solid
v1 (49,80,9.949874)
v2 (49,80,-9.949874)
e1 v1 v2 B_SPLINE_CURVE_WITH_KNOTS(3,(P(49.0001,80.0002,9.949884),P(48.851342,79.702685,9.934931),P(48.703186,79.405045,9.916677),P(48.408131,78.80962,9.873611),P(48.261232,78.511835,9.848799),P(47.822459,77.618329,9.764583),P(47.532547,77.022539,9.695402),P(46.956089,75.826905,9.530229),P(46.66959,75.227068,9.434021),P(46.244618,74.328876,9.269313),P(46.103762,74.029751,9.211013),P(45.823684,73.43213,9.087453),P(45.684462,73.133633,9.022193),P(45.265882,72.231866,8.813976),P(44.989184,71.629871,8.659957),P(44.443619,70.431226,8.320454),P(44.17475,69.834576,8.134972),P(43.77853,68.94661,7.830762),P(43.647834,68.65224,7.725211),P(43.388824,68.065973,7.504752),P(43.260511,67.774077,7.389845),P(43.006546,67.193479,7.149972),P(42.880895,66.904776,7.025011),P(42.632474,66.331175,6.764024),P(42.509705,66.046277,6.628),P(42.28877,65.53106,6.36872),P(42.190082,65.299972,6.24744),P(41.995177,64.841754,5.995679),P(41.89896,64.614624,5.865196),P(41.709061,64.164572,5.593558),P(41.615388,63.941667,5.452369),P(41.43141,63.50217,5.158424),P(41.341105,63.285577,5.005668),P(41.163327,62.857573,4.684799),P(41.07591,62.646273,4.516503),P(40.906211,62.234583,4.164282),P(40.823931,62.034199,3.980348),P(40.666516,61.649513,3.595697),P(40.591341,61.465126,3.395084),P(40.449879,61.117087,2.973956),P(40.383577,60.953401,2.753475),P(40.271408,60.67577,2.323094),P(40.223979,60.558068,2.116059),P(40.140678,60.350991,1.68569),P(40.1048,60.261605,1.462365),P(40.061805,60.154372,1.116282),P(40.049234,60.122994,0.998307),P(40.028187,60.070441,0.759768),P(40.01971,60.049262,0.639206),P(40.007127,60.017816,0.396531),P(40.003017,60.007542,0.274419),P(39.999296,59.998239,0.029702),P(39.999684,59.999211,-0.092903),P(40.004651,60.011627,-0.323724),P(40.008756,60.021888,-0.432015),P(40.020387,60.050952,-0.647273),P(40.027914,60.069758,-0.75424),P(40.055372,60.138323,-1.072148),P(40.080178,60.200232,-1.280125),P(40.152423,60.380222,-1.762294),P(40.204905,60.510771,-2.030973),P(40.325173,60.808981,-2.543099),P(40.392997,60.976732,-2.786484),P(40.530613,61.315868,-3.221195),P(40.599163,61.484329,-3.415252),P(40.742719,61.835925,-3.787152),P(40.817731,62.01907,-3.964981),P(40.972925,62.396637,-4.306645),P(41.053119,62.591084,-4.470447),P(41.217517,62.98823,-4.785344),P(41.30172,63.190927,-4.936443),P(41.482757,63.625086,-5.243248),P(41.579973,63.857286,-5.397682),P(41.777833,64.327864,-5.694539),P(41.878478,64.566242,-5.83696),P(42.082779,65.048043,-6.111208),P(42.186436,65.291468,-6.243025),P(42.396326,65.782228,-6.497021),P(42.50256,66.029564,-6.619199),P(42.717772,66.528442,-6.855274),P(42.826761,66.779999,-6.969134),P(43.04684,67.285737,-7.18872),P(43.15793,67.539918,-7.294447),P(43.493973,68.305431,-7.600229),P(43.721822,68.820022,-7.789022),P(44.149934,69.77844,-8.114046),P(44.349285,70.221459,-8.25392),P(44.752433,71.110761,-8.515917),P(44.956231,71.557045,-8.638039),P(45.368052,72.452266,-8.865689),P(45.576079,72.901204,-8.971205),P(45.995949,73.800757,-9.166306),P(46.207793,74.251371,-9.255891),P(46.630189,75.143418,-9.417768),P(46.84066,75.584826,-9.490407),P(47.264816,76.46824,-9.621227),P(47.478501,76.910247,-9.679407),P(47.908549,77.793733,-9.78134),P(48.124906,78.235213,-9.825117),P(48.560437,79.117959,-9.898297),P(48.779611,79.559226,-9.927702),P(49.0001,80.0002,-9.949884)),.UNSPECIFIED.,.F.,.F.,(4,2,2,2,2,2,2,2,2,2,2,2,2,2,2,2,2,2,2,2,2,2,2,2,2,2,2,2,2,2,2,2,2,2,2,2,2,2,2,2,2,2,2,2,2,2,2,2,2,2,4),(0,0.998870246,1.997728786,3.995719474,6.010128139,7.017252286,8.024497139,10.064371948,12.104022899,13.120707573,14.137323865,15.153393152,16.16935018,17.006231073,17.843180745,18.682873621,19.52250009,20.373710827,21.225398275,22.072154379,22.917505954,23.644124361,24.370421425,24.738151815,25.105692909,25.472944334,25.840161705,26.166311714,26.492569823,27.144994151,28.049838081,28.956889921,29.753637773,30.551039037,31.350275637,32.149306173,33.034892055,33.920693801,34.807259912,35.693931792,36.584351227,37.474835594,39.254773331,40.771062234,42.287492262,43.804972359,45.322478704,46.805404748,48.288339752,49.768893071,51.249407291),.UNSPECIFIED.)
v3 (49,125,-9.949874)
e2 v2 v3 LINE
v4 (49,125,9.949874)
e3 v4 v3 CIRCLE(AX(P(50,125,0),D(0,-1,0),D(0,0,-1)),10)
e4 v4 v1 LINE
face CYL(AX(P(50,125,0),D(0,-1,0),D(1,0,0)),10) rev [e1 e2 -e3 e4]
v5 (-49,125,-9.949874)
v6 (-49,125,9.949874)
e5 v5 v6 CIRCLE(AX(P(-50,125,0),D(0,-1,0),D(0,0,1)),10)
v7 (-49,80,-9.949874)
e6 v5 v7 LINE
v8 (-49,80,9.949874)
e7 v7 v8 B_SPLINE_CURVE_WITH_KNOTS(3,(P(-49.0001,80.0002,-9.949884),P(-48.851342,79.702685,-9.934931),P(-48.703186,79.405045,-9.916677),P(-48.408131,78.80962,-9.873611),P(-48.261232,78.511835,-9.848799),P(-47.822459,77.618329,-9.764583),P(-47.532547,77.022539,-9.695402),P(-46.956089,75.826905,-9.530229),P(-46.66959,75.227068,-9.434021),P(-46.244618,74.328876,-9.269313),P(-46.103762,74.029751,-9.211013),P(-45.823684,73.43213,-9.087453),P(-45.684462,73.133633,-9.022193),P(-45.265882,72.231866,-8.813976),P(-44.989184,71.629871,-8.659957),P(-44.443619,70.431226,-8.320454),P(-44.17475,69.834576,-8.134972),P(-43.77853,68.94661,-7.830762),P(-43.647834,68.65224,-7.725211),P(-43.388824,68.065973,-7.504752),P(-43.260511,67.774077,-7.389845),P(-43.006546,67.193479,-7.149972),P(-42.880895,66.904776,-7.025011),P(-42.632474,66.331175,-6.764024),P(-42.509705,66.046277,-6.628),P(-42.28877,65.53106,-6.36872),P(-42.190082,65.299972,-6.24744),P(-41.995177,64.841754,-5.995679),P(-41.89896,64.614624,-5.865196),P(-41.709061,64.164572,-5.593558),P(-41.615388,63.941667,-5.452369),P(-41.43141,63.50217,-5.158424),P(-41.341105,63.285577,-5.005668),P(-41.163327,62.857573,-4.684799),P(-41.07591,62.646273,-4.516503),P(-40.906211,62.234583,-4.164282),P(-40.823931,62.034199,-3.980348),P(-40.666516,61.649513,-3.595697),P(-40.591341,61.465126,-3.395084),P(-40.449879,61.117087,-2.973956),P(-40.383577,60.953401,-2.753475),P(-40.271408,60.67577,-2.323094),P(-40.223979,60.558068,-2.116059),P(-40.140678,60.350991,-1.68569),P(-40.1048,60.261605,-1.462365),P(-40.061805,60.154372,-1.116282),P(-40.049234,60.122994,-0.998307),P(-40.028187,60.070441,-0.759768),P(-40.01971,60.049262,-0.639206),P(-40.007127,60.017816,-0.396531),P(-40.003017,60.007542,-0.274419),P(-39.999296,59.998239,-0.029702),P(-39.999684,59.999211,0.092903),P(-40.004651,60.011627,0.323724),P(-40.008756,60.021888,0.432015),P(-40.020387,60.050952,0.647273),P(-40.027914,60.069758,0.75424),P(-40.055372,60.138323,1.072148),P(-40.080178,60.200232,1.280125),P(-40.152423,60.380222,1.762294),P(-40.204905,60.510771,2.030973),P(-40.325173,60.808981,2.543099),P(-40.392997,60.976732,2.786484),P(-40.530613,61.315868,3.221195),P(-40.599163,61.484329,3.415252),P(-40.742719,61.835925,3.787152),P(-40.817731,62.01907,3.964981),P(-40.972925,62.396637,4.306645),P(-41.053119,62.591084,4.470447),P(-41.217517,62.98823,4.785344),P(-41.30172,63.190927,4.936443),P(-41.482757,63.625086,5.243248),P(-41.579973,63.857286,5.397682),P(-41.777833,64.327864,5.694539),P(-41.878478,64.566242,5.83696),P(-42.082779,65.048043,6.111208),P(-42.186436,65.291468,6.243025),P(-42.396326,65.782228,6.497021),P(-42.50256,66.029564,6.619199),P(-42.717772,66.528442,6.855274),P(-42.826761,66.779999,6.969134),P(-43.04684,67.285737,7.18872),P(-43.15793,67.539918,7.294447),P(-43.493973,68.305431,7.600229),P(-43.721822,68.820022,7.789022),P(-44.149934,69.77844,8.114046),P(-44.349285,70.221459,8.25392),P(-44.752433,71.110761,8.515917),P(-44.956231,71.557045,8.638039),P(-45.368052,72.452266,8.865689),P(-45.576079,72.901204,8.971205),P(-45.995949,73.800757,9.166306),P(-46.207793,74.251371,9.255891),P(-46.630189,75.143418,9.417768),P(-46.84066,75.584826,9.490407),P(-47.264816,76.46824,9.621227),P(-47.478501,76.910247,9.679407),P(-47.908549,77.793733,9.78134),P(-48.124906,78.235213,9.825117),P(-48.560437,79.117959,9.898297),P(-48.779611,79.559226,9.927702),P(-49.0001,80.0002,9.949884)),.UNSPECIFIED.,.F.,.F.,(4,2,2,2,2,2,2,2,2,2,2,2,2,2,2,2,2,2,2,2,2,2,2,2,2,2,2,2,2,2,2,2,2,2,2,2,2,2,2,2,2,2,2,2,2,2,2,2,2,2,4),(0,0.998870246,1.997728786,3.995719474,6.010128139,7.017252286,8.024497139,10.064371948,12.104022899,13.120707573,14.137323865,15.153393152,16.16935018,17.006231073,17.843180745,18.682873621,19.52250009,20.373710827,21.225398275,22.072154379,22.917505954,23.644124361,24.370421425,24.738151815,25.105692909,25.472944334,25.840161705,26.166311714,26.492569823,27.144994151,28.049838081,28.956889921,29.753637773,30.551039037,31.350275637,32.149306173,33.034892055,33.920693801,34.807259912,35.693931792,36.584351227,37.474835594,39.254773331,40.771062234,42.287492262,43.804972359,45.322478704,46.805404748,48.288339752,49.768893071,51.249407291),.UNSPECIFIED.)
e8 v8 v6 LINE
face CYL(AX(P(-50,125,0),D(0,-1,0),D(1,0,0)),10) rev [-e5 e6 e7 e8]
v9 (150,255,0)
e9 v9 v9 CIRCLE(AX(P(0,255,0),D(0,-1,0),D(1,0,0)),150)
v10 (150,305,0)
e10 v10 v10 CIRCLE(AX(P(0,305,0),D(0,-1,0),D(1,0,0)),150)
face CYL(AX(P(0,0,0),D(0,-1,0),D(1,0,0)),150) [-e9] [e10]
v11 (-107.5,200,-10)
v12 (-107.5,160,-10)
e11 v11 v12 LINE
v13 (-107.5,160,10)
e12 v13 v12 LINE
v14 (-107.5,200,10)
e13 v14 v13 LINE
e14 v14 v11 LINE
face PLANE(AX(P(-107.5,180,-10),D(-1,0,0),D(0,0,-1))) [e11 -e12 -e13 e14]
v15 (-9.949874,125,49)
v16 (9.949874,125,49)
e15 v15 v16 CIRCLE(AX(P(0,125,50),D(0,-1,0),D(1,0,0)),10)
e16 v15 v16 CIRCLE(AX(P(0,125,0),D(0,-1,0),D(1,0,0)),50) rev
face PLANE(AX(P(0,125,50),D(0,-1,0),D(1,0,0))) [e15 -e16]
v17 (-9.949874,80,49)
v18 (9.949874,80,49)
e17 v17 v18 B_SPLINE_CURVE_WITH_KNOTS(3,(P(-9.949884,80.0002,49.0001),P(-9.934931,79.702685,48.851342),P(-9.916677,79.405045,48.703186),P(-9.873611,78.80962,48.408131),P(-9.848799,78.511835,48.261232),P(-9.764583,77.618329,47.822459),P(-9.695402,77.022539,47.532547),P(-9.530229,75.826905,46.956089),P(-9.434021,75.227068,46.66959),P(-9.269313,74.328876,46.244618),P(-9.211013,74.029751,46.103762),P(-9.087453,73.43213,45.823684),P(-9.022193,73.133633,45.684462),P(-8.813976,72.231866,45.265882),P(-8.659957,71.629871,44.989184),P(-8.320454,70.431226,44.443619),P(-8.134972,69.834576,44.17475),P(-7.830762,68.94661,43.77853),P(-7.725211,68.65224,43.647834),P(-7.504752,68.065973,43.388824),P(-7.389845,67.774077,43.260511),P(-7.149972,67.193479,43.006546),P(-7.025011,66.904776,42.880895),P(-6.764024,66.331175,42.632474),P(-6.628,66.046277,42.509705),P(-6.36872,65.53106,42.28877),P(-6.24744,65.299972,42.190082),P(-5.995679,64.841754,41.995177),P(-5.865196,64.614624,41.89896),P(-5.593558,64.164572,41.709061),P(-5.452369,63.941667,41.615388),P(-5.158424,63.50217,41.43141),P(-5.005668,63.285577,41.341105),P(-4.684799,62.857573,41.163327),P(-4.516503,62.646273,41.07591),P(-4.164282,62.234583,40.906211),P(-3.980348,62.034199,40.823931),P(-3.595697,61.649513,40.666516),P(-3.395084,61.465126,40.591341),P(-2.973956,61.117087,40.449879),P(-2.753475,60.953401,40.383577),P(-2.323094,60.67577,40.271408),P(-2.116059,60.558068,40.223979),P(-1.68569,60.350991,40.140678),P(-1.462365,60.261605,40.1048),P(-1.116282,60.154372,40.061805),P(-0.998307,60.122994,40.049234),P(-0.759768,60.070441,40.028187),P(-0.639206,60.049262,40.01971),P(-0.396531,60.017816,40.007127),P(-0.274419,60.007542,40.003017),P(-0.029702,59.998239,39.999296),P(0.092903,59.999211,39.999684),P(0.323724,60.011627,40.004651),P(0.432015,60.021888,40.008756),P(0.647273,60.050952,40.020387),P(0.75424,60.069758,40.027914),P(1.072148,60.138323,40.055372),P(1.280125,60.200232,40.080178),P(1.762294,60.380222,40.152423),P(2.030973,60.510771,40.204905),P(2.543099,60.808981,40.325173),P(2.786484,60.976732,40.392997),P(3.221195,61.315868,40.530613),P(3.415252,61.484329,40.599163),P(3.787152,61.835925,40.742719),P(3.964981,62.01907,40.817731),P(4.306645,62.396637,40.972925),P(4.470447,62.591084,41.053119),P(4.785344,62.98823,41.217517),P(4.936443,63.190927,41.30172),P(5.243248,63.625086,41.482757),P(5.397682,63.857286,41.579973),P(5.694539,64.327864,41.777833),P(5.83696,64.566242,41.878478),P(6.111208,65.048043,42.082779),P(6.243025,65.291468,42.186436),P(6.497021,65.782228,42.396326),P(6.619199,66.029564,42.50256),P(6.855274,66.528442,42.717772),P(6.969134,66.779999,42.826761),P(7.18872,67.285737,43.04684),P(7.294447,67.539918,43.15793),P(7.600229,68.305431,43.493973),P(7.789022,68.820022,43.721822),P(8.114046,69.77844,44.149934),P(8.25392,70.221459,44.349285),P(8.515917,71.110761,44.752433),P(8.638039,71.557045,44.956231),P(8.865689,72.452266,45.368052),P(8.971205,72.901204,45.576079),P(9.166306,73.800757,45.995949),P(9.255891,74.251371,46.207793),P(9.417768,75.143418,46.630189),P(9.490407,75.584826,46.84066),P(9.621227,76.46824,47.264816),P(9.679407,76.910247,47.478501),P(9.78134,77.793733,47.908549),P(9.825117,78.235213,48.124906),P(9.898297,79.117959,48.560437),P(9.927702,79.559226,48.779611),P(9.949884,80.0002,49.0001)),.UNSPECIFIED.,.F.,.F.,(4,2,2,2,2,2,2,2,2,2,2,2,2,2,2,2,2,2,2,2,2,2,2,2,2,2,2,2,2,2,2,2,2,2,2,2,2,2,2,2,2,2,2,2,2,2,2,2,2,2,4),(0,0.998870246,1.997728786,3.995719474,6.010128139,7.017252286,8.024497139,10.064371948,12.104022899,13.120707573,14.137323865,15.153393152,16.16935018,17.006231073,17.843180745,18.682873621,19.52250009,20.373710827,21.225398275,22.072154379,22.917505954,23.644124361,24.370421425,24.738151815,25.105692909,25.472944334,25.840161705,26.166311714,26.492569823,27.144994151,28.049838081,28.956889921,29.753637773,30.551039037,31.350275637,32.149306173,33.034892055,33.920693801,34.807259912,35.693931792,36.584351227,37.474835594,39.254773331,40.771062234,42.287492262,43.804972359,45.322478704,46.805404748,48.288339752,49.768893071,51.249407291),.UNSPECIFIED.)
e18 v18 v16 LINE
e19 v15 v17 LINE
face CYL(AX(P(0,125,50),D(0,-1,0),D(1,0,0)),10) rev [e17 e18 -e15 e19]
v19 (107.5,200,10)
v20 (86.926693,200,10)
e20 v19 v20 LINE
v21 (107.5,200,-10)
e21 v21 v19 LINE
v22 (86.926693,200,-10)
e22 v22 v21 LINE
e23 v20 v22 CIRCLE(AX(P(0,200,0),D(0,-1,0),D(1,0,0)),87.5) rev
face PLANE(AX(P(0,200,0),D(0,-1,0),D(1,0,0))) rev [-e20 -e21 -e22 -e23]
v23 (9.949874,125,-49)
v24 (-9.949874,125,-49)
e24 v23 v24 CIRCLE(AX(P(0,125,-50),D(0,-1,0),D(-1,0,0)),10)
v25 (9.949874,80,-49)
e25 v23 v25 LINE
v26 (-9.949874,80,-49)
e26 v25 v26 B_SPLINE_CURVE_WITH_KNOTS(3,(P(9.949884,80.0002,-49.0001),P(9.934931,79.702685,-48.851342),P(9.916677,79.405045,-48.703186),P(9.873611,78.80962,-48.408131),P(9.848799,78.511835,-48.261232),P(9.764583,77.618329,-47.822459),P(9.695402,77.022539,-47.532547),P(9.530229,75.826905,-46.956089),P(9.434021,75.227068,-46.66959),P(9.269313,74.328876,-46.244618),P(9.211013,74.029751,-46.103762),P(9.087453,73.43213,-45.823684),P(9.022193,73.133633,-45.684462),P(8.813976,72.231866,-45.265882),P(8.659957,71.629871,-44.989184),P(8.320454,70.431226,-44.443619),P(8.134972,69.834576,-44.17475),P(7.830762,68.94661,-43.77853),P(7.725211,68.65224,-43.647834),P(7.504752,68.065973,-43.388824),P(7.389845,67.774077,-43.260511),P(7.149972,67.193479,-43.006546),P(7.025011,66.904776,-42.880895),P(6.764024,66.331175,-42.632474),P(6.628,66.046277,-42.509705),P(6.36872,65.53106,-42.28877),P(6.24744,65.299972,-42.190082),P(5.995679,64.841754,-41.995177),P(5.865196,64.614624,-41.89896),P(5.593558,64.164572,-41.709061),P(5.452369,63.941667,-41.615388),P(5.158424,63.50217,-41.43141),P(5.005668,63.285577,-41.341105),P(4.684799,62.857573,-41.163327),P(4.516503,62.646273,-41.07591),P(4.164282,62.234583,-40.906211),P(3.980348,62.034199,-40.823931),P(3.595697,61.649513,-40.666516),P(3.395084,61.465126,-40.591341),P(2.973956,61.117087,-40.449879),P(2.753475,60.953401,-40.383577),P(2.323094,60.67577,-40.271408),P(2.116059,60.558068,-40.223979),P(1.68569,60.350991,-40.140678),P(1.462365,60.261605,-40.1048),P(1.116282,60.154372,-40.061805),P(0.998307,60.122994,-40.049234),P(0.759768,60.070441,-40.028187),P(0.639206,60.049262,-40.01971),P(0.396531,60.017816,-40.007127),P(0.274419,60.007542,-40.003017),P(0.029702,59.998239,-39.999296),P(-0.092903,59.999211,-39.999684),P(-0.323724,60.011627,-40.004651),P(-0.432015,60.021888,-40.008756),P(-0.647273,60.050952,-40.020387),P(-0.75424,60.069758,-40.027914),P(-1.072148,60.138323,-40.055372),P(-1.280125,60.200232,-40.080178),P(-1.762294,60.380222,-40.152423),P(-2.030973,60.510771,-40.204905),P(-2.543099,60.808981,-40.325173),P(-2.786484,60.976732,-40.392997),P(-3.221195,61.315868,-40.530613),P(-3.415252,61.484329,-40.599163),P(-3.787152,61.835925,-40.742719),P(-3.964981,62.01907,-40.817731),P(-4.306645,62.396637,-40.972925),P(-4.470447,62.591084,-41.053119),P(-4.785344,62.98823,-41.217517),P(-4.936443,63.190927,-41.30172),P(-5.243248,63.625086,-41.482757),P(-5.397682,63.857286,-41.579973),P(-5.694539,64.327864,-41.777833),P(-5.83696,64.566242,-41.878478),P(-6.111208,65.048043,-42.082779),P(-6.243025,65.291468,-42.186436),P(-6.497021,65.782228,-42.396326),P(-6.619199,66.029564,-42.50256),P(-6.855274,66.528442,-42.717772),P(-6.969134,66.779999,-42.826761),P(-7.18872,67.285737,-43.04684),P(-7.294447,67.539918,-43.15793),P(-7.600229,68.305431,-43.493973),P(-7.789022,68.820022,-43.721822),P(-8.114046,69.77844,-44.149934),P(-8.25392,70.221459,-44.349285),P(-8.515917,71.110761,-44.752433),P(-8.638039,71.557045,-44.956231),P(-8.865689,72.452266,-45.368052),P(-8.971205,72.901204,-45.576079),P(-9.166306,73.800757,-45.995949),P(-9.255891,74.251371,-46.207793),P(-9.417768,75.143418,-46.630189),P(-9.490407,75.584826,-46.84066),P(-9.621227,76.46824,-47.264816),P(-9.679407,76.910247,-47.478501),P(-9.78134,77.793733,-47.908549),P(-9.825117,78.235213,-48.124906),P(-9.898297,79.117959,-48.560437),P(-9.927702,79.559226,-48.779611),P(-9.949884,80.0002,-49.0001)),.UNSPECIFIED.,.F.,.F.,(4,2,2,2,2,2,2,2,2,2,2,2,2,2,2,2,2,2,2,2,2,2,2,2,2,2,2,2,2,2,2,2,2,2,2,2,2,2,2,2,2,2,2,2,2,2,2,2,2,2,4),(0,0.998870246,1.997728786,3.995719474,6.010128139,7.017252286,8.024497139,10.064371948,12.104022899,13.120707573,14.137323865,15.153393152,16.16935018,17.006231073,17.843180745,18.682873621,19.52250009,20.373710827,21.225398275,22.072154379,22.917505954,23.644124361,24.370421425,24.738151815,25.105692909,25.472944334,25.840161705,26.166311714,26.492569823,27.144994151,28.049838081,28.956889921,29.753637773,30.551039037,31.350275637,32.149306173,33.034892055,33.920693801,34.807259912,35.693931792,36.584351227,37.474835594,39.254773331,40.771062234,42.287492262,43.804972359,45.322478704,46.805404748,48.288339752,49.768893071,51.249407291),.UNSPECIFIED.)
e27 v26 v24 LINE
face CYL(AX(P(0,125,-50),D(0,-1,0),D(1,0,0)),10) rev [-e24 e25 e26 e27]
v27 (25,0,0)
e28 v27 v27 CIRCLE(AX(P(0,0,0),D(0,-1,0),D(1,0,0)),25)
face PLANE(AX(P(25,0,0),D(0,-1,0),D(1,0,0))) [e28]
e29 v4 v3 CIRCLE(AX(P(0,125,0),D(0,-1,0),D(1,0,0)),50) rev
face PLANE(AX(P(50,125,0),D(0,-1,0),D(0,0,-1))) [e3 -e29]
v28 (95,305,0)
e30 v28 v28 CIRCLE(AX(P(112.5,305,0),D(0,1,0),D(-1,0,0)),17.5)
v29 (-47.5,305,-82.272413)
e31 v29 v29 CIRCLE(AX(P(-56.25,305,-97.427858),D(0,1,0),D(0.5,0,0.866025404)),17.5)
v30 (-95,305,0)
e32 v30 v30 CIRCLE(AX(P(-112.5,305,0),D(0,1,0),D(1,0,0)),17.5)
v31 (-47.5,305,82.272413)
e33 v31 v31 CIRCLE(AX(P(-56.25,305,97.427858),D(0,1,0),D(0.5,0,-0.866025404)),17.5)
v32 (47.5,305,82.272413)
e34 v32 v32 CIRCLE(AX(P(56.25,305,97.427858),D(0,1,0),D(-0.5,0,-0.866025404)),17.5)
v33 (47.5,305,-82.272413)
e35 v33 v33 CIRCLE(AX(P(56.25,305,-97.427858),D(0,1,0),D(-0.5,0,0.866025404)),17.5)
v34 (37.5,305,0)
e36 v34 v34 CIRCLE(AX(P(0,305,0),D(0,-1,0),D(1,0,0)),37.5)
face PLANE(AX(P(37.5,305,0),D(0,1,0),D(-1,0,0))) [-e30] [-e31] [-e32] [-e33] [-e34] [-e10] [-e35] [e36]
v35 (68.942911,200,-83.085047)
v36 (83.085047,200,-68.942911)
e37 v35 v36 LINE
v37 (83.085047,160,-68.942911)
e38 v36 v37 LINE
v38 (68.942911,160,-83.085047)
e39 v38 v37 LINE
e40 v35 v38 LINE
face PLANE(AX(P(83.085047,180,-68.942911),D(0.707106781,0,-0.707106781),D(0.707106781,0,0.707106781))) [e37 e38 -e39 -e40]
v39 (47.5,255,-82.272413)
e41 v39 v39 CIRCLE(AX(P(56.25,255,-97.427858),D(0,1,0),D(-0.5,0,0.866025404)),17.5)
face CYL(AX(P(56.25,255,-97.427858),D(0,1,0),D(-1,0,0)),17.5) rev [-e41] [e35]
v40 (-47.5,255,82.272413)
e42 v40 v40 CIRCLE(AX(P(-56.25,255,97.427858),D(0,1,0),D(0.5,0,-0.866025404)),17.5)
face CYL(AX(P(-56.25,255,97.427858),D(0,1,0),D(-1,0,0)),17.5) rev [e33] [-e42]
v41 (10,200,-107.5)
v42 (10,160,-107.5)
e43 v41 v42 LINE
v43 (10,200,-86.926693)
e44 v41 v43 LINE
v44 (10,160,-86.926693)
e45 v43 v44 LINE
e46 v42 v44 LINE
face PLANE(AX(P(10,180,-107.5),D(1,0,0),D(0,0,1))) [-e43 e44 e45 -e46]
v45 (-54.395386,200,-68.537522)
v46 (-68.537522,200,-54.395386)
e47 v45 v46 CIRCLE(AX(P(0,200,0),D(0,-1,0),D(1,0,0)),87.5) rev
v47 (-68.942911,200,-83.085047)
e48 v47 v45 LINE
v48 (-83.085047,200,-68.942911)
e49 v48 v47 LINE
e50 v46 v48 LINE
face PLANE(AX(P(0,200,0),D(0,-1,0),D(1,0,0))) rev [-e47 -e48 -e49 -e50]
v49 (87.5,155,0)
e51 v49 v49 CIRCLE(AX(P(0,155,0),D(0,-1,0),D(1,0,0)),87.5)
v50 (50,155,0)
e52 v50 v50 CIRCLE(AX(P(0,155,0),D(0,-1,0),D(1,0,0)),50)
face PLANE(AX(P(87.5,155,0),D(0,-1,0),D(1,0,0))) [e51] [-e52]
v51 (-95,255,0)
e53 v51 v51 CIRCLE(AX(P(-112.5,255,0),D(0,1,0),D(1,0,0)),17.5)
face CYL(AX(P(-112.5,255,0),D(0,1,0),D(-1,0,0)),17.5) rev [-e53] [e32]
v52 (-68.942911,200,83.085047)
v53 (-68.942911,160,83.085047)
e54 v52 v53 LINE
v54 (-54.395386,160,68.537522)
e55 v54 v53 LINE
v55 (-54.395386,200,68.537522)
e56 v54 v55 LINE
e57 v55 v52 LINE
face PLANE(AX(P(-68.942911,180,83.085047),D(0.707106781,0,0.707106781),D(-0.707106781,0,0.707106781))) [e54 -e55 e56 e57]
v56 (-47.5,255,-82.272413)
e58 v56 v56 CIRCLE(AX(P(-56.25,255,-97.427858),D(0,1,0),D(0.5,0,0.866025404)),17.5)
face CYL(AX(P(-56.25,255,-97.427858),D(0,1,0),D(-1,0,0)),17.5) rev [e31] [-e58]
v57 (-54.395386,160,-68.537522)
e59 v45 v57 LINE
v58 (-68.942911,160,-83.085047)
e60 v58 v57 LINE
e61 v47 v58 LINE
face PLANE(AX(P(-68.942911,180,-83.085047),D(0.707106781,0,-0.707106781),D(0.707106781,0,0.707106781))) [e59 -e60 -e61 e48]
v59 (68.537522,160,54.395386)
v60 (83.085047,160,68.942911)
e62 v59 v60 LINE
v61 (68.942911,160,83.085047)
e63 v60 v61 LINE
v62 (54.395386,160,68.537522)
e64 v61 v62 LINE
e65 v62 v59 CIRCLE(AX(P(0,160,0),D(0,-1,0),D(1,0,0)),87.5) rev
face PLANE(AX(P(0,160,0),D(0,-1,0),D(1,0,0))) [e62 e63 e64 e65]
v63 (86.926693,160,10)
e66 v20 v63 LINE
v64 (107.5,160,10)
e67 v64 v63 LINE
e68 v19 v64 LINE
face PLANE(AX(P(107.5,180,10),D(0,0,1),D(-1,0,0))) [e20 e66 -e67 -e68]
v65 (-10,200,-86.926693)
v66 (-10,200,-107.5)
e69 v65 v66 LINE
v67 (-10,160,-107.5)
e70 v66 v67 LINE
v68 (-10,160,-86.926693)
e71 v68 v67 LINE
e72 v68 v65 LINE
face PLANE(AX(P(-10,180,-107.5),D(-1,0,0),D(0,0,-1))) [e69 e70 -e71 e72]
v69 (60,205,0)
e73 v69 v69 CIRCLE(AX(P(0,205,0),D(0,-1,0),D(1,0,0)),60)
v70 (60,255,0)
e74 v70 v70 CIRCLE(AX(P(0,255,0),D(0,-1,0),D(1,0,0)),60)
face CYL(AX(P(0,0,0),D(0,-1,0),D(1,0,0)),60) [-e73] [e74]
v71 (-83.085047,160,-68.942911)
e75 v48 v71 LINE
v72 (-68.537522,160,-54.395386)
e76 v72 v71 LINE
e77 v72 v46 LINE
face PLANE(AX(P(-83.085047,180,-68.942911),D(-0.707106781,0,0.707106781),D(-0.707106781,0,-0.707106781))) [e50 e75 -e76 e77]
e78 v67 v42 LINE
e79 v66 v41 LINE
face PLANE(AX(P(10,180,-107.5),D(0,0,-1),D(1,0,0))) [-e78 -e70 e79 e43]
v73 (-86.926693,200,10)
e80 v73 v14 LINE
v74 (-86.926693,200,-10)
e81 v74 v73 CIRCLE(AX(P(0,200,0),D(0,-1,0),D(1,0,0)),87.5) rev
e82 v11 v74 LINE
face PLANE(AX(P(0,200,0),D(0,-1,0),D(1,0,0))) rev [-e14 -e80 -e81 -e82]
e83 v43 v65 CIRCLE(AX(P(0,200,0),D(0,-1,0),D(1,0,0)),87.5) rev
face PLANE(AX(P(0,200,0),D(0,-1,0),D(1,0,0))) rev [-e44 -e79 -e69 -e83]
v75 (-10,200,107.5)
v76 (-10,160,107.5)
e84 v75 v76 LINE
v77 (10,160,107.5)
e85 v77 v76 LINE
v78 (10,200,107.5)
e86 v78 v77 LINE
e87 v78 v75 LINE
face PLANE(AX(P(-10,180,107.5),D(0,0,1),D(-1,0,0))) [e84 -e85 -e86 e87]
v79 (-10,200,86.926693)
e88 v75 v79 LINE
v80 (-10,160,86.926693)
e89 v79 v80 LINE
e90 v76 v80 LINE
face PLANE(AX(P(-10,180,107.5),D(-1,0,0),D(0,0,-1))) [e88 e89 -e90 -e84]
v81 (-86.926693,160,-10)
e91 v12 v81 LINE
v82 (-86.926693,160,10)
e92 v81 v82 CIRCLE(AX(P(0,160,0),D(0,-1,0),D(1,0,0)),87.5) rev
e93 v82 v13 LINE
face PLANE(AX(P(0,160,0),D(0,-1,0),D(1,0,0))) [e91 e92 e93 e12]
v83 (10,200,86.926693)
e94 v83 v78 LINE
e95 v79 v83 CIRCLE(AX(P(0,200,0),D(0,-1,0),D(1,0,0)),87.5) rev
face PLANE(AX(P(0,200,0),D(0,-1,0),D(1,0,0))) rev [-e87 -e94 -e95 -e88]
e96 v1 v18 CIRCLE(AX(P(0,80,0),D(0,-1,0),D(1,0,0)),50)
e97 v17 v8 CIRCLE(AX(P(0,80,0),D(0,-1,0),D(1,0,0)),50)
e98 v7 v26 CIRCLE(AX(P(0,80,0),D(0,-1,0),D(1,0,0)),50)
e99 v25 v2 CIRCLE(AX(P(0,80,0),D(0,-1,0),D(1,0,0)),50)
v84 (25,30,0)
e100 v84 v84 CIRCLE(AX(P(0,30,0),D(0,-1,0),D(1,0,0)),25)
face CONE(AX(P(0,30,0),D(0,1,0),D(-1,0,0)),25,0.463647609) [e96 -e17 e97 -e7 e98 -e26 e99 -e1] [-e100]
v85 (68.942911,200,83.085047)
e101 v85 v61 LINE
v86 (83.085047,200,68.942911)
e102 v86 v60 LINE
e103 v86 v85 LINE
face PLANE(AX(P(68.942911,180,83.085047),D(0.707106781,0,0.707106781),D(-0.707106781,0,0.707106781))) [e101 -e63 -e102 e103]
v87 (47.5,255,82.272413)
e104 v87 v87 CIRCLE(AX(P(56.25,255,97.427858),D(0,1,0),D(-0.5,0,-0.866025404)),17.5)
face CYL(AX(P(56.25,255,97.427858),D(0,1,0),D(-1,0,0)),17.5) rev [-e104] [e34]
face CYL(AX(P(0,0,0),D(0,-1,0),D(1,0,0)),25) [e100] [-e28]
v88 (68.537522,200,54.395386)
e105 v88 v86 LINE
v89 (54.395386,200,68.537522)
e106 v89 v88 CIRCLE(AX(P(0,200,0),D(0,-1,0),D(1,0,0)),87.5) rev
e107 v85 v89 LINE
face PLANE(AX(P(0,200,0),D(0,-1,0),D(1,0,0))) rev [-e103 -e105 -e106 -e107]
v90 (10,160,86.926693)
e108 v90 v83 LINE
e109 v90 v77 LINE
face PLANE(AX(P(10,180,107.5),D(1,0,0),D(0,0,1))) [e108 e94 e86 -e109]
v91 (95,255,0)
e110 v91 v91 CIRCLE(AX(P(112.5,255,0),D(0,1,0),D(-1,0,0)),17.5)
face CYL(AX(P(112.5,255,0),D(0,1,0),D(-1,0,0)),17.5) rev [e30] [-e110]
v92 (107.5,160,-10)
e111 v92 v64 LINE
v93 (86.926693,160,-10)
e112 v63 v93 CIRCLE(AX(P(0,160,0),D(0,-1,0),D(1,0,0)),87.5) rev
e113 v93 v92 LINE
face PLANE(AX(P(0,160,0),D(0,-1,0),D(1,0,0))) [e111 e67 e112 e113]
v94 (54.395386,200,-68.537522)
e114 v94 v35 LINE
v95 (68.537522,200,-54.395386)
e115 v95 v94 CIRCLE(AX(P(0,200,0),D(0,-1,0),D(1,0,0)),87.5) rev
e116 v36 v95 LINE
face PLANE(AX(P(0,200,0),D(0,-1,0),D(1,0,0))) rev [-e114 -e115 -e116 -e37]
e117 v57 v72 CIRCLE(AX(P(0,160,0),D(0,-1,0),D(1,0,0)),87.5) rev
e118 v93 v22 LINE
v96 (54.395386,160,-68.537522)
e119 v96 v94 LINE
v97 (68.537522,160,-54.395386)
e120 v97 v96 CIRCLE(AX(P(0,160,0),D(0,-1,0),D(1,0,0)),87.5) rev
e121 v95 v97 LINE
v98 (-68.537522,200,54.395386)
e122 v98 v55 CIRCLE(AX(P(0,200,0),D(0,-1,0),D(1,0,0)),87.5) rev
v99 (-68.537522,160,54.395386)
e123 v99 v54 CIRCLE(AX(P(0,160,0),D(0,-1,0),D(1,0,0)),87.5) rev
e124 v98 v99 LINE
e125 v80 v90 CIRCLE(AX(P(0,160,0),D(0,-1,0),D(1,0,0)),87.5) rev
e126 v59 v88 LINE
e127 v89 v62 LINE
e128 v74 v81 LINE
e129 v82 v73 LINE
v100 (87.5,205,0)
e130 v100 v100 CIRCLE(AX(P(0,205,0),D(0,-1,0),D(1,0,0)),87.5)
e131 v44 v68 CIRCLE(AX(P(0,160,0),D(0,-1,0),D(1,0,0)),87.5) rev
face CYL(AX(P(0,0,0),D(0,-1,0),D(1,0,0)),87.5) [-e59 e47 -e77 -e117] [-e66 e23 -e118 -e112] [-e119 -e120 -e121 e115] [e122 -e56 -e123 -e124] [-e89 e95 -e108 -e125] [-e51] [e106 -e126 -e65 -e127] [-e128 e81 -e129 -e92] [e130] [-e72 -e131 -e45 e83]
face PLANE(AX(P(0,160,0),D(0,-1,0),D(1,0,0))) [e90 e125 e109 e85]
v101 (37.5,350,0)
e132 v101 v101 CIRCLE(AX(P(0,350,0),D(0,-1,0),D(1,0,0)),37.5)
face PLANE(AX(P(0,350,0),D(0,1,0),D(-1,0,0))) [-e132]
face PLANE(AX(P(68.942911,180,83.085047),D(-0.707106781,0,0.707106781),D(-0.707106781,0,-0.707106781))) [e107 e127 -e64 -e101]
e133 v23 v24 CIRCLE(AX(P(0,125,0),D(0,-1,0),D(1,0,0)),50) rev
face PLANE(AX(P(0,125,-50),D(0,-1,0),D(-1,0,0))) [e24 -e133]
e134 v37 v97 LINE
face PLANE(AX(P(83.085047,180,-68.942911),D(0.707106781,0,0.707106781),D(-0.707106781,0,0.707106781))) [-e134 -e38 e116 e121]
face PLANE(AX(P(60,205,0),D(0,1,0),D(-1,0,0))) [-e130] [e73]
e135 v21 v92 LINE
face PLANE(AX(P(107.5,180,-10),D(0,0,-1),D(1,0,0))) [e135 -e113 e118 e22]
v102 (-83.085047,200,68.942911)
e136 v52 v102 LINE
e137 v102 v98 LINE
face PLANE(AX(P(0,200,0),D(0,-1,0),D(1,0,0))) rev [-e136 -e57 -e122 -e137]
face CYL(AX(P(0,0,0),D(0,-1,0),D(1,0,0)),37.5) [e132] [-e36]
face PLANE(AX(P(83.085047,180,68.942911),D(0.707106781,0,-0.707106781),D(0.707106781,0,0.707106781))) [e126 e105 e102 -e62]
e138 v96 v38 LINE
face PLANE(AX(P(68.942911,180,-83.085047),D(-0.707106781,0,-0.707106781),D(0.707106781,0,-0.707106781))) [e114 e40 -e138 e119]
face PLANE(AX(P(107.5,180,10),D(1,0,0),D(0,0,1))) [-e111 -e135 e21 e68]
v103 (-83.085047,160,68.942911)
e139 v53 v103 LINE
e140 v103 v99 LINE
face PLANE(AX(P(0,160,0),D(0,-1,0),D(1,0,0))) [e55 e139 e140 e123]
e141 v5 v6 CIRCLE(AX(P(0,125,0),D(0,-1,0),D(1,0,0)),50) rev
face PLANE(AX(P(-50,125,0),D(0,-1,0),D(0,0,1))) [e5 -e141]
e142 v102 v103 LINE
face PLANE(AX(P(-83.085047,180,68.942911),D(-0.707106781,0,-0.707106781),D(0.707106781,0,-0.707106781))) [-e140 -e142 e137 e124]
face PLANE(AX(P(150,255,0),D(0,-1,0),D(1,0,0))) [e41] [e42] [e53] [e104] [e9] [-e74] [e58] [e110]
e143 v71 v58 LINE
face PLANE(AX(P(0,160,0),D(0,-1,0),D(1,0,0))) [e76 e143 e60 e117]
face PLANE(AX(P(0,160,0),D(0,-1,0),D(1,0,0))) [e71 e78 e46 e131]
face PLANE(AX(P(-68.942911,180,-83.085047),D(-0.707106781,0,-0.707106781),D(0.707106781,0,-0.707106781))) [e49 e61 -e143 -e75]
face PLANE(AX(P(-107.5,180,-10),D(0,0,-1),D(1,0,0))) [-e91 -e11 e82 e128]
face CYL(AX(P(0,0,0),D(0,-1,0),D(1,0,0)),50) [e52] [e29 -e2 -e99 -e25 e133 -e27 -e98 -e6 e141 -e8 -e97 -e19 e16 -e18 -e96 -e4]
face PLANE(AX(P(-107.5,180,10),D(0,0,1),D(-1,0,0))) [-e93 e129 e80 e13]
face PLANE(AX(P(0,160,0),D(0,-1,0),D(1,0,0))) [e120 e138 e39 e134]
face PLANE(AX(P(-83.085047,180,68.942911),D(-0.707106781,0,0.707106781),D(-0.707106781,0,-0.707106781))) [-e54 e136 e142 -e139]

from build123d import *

# Parameters (mm, degrees)
HOLE2_START        = 255
HOLE2_OUTLINE_R    = 17.5
HOLE2_DEPTH        = 50
CIRPATTERN1_COUNT  = 6
RIB2_START         = -20
RIB2_DEPTH         = 40
CIRPATTERN2_COUNT  = 8
SKETCH13_R         = 10
CUT_EXTRUDE1_DEPTH = 125
CIRPATTERN3_COUNT  = 4


# Read off the part's stored shape, not the designer's step: Hole2, Rib2
with BuildPart() as part:
    # Sketch1 → Revolve1 (revolve)
    with BuildSketch(Plane.XY):
        Polygon((0, 0), (0, 350), (37.5, 350), (37.5, 305), (150, 305), (150, 255), (60, 255), (60, 205), (87.5, 205), (87.5, 155), (50, 155), (50, 80), (25, 30), (25, 0), align=None)
    revolve(axis=Axis((0, 0, 0), (0, 1, 0)))

    # Hole2 outline → Hole2 (cut)
    with BuildSketch(Plane(origin=(0, 0, 0), x_dir=(1, 0, 0), z_dir=(0, 1, 0)).offset(HOLE2_START)):
        with Locations((112.5, 0)):
            Circle(HOLE2_OUTLINE_R)
    hole2 = extrude(amount=HOLE2_DEPTH, mode=Mode.SUBTRACT)

    # CirPattern1: Hole2 ×6 about axis
    cirpattern1_axis = Axis((0, 0, 0), (0, 1, 0))
    for i in range(1, CIRPATTERN1_COUNT):
        add(hole2.rotate(cirpattern1_axis, i * 360 / CIRPATTERN1_COUNT), mode=Mode.SUBTRACT)

    # Rib2 outline → Rib2 (add)
    with BuildSketch(Plane(origin=(0, 180, 0), x_dir=(-1, 0, 0), z_dir=(0, -1, 0)).offset(RIB2_START)):
        with BuildLine():
            ThreePointArc((-10, 86.926693254), (0, 87.5), (10, 86.926693254))
            Line((10, 86.926693254), (10, 107.5))
            Line((10, 107.5), (-10, 107.5))
            Line((-10, 107.5), (-10, 86.926693254))
        make_face()
    rib2 = extrude(amount=RIB2_DEPTH)

    # CirPattern2: Rib2 ×8 about axis
    cirpattern2_axis = Axis((0, 0, 0), (0, 1, 0))
    for i in range(1, CIRPATTERN2_COUNT):
        add(rib2.rotate(cirpattern2_axis, i * 360 / CIRPATTERN2_COUNT))

    # Sketch13 → Cut-Extrude1 (cut)
    with BuildSketch(Plane.XZ):
        with Locations((0, 50)):
            Circle(SKETCH13_R)
    cut_extrude1 = extrude(amount=-CUT_EXTRUDE1_DEPTH, mode=Mode.SUBTRACT)

    # CirPattern3: Cut-Extrude1 ×4 about axis
    cirpattern3_axis = Axis((0, 0, 0), (0, 1, 0))
    for i in range(1, CIRPATTERN3_COUNT):
        add(cut_extrude1.rotate(cirpattern3_axis, i * 360 / CIRPATTERN3_COUNT), mode=Mode.SUBTRACT)


solid = part.part
